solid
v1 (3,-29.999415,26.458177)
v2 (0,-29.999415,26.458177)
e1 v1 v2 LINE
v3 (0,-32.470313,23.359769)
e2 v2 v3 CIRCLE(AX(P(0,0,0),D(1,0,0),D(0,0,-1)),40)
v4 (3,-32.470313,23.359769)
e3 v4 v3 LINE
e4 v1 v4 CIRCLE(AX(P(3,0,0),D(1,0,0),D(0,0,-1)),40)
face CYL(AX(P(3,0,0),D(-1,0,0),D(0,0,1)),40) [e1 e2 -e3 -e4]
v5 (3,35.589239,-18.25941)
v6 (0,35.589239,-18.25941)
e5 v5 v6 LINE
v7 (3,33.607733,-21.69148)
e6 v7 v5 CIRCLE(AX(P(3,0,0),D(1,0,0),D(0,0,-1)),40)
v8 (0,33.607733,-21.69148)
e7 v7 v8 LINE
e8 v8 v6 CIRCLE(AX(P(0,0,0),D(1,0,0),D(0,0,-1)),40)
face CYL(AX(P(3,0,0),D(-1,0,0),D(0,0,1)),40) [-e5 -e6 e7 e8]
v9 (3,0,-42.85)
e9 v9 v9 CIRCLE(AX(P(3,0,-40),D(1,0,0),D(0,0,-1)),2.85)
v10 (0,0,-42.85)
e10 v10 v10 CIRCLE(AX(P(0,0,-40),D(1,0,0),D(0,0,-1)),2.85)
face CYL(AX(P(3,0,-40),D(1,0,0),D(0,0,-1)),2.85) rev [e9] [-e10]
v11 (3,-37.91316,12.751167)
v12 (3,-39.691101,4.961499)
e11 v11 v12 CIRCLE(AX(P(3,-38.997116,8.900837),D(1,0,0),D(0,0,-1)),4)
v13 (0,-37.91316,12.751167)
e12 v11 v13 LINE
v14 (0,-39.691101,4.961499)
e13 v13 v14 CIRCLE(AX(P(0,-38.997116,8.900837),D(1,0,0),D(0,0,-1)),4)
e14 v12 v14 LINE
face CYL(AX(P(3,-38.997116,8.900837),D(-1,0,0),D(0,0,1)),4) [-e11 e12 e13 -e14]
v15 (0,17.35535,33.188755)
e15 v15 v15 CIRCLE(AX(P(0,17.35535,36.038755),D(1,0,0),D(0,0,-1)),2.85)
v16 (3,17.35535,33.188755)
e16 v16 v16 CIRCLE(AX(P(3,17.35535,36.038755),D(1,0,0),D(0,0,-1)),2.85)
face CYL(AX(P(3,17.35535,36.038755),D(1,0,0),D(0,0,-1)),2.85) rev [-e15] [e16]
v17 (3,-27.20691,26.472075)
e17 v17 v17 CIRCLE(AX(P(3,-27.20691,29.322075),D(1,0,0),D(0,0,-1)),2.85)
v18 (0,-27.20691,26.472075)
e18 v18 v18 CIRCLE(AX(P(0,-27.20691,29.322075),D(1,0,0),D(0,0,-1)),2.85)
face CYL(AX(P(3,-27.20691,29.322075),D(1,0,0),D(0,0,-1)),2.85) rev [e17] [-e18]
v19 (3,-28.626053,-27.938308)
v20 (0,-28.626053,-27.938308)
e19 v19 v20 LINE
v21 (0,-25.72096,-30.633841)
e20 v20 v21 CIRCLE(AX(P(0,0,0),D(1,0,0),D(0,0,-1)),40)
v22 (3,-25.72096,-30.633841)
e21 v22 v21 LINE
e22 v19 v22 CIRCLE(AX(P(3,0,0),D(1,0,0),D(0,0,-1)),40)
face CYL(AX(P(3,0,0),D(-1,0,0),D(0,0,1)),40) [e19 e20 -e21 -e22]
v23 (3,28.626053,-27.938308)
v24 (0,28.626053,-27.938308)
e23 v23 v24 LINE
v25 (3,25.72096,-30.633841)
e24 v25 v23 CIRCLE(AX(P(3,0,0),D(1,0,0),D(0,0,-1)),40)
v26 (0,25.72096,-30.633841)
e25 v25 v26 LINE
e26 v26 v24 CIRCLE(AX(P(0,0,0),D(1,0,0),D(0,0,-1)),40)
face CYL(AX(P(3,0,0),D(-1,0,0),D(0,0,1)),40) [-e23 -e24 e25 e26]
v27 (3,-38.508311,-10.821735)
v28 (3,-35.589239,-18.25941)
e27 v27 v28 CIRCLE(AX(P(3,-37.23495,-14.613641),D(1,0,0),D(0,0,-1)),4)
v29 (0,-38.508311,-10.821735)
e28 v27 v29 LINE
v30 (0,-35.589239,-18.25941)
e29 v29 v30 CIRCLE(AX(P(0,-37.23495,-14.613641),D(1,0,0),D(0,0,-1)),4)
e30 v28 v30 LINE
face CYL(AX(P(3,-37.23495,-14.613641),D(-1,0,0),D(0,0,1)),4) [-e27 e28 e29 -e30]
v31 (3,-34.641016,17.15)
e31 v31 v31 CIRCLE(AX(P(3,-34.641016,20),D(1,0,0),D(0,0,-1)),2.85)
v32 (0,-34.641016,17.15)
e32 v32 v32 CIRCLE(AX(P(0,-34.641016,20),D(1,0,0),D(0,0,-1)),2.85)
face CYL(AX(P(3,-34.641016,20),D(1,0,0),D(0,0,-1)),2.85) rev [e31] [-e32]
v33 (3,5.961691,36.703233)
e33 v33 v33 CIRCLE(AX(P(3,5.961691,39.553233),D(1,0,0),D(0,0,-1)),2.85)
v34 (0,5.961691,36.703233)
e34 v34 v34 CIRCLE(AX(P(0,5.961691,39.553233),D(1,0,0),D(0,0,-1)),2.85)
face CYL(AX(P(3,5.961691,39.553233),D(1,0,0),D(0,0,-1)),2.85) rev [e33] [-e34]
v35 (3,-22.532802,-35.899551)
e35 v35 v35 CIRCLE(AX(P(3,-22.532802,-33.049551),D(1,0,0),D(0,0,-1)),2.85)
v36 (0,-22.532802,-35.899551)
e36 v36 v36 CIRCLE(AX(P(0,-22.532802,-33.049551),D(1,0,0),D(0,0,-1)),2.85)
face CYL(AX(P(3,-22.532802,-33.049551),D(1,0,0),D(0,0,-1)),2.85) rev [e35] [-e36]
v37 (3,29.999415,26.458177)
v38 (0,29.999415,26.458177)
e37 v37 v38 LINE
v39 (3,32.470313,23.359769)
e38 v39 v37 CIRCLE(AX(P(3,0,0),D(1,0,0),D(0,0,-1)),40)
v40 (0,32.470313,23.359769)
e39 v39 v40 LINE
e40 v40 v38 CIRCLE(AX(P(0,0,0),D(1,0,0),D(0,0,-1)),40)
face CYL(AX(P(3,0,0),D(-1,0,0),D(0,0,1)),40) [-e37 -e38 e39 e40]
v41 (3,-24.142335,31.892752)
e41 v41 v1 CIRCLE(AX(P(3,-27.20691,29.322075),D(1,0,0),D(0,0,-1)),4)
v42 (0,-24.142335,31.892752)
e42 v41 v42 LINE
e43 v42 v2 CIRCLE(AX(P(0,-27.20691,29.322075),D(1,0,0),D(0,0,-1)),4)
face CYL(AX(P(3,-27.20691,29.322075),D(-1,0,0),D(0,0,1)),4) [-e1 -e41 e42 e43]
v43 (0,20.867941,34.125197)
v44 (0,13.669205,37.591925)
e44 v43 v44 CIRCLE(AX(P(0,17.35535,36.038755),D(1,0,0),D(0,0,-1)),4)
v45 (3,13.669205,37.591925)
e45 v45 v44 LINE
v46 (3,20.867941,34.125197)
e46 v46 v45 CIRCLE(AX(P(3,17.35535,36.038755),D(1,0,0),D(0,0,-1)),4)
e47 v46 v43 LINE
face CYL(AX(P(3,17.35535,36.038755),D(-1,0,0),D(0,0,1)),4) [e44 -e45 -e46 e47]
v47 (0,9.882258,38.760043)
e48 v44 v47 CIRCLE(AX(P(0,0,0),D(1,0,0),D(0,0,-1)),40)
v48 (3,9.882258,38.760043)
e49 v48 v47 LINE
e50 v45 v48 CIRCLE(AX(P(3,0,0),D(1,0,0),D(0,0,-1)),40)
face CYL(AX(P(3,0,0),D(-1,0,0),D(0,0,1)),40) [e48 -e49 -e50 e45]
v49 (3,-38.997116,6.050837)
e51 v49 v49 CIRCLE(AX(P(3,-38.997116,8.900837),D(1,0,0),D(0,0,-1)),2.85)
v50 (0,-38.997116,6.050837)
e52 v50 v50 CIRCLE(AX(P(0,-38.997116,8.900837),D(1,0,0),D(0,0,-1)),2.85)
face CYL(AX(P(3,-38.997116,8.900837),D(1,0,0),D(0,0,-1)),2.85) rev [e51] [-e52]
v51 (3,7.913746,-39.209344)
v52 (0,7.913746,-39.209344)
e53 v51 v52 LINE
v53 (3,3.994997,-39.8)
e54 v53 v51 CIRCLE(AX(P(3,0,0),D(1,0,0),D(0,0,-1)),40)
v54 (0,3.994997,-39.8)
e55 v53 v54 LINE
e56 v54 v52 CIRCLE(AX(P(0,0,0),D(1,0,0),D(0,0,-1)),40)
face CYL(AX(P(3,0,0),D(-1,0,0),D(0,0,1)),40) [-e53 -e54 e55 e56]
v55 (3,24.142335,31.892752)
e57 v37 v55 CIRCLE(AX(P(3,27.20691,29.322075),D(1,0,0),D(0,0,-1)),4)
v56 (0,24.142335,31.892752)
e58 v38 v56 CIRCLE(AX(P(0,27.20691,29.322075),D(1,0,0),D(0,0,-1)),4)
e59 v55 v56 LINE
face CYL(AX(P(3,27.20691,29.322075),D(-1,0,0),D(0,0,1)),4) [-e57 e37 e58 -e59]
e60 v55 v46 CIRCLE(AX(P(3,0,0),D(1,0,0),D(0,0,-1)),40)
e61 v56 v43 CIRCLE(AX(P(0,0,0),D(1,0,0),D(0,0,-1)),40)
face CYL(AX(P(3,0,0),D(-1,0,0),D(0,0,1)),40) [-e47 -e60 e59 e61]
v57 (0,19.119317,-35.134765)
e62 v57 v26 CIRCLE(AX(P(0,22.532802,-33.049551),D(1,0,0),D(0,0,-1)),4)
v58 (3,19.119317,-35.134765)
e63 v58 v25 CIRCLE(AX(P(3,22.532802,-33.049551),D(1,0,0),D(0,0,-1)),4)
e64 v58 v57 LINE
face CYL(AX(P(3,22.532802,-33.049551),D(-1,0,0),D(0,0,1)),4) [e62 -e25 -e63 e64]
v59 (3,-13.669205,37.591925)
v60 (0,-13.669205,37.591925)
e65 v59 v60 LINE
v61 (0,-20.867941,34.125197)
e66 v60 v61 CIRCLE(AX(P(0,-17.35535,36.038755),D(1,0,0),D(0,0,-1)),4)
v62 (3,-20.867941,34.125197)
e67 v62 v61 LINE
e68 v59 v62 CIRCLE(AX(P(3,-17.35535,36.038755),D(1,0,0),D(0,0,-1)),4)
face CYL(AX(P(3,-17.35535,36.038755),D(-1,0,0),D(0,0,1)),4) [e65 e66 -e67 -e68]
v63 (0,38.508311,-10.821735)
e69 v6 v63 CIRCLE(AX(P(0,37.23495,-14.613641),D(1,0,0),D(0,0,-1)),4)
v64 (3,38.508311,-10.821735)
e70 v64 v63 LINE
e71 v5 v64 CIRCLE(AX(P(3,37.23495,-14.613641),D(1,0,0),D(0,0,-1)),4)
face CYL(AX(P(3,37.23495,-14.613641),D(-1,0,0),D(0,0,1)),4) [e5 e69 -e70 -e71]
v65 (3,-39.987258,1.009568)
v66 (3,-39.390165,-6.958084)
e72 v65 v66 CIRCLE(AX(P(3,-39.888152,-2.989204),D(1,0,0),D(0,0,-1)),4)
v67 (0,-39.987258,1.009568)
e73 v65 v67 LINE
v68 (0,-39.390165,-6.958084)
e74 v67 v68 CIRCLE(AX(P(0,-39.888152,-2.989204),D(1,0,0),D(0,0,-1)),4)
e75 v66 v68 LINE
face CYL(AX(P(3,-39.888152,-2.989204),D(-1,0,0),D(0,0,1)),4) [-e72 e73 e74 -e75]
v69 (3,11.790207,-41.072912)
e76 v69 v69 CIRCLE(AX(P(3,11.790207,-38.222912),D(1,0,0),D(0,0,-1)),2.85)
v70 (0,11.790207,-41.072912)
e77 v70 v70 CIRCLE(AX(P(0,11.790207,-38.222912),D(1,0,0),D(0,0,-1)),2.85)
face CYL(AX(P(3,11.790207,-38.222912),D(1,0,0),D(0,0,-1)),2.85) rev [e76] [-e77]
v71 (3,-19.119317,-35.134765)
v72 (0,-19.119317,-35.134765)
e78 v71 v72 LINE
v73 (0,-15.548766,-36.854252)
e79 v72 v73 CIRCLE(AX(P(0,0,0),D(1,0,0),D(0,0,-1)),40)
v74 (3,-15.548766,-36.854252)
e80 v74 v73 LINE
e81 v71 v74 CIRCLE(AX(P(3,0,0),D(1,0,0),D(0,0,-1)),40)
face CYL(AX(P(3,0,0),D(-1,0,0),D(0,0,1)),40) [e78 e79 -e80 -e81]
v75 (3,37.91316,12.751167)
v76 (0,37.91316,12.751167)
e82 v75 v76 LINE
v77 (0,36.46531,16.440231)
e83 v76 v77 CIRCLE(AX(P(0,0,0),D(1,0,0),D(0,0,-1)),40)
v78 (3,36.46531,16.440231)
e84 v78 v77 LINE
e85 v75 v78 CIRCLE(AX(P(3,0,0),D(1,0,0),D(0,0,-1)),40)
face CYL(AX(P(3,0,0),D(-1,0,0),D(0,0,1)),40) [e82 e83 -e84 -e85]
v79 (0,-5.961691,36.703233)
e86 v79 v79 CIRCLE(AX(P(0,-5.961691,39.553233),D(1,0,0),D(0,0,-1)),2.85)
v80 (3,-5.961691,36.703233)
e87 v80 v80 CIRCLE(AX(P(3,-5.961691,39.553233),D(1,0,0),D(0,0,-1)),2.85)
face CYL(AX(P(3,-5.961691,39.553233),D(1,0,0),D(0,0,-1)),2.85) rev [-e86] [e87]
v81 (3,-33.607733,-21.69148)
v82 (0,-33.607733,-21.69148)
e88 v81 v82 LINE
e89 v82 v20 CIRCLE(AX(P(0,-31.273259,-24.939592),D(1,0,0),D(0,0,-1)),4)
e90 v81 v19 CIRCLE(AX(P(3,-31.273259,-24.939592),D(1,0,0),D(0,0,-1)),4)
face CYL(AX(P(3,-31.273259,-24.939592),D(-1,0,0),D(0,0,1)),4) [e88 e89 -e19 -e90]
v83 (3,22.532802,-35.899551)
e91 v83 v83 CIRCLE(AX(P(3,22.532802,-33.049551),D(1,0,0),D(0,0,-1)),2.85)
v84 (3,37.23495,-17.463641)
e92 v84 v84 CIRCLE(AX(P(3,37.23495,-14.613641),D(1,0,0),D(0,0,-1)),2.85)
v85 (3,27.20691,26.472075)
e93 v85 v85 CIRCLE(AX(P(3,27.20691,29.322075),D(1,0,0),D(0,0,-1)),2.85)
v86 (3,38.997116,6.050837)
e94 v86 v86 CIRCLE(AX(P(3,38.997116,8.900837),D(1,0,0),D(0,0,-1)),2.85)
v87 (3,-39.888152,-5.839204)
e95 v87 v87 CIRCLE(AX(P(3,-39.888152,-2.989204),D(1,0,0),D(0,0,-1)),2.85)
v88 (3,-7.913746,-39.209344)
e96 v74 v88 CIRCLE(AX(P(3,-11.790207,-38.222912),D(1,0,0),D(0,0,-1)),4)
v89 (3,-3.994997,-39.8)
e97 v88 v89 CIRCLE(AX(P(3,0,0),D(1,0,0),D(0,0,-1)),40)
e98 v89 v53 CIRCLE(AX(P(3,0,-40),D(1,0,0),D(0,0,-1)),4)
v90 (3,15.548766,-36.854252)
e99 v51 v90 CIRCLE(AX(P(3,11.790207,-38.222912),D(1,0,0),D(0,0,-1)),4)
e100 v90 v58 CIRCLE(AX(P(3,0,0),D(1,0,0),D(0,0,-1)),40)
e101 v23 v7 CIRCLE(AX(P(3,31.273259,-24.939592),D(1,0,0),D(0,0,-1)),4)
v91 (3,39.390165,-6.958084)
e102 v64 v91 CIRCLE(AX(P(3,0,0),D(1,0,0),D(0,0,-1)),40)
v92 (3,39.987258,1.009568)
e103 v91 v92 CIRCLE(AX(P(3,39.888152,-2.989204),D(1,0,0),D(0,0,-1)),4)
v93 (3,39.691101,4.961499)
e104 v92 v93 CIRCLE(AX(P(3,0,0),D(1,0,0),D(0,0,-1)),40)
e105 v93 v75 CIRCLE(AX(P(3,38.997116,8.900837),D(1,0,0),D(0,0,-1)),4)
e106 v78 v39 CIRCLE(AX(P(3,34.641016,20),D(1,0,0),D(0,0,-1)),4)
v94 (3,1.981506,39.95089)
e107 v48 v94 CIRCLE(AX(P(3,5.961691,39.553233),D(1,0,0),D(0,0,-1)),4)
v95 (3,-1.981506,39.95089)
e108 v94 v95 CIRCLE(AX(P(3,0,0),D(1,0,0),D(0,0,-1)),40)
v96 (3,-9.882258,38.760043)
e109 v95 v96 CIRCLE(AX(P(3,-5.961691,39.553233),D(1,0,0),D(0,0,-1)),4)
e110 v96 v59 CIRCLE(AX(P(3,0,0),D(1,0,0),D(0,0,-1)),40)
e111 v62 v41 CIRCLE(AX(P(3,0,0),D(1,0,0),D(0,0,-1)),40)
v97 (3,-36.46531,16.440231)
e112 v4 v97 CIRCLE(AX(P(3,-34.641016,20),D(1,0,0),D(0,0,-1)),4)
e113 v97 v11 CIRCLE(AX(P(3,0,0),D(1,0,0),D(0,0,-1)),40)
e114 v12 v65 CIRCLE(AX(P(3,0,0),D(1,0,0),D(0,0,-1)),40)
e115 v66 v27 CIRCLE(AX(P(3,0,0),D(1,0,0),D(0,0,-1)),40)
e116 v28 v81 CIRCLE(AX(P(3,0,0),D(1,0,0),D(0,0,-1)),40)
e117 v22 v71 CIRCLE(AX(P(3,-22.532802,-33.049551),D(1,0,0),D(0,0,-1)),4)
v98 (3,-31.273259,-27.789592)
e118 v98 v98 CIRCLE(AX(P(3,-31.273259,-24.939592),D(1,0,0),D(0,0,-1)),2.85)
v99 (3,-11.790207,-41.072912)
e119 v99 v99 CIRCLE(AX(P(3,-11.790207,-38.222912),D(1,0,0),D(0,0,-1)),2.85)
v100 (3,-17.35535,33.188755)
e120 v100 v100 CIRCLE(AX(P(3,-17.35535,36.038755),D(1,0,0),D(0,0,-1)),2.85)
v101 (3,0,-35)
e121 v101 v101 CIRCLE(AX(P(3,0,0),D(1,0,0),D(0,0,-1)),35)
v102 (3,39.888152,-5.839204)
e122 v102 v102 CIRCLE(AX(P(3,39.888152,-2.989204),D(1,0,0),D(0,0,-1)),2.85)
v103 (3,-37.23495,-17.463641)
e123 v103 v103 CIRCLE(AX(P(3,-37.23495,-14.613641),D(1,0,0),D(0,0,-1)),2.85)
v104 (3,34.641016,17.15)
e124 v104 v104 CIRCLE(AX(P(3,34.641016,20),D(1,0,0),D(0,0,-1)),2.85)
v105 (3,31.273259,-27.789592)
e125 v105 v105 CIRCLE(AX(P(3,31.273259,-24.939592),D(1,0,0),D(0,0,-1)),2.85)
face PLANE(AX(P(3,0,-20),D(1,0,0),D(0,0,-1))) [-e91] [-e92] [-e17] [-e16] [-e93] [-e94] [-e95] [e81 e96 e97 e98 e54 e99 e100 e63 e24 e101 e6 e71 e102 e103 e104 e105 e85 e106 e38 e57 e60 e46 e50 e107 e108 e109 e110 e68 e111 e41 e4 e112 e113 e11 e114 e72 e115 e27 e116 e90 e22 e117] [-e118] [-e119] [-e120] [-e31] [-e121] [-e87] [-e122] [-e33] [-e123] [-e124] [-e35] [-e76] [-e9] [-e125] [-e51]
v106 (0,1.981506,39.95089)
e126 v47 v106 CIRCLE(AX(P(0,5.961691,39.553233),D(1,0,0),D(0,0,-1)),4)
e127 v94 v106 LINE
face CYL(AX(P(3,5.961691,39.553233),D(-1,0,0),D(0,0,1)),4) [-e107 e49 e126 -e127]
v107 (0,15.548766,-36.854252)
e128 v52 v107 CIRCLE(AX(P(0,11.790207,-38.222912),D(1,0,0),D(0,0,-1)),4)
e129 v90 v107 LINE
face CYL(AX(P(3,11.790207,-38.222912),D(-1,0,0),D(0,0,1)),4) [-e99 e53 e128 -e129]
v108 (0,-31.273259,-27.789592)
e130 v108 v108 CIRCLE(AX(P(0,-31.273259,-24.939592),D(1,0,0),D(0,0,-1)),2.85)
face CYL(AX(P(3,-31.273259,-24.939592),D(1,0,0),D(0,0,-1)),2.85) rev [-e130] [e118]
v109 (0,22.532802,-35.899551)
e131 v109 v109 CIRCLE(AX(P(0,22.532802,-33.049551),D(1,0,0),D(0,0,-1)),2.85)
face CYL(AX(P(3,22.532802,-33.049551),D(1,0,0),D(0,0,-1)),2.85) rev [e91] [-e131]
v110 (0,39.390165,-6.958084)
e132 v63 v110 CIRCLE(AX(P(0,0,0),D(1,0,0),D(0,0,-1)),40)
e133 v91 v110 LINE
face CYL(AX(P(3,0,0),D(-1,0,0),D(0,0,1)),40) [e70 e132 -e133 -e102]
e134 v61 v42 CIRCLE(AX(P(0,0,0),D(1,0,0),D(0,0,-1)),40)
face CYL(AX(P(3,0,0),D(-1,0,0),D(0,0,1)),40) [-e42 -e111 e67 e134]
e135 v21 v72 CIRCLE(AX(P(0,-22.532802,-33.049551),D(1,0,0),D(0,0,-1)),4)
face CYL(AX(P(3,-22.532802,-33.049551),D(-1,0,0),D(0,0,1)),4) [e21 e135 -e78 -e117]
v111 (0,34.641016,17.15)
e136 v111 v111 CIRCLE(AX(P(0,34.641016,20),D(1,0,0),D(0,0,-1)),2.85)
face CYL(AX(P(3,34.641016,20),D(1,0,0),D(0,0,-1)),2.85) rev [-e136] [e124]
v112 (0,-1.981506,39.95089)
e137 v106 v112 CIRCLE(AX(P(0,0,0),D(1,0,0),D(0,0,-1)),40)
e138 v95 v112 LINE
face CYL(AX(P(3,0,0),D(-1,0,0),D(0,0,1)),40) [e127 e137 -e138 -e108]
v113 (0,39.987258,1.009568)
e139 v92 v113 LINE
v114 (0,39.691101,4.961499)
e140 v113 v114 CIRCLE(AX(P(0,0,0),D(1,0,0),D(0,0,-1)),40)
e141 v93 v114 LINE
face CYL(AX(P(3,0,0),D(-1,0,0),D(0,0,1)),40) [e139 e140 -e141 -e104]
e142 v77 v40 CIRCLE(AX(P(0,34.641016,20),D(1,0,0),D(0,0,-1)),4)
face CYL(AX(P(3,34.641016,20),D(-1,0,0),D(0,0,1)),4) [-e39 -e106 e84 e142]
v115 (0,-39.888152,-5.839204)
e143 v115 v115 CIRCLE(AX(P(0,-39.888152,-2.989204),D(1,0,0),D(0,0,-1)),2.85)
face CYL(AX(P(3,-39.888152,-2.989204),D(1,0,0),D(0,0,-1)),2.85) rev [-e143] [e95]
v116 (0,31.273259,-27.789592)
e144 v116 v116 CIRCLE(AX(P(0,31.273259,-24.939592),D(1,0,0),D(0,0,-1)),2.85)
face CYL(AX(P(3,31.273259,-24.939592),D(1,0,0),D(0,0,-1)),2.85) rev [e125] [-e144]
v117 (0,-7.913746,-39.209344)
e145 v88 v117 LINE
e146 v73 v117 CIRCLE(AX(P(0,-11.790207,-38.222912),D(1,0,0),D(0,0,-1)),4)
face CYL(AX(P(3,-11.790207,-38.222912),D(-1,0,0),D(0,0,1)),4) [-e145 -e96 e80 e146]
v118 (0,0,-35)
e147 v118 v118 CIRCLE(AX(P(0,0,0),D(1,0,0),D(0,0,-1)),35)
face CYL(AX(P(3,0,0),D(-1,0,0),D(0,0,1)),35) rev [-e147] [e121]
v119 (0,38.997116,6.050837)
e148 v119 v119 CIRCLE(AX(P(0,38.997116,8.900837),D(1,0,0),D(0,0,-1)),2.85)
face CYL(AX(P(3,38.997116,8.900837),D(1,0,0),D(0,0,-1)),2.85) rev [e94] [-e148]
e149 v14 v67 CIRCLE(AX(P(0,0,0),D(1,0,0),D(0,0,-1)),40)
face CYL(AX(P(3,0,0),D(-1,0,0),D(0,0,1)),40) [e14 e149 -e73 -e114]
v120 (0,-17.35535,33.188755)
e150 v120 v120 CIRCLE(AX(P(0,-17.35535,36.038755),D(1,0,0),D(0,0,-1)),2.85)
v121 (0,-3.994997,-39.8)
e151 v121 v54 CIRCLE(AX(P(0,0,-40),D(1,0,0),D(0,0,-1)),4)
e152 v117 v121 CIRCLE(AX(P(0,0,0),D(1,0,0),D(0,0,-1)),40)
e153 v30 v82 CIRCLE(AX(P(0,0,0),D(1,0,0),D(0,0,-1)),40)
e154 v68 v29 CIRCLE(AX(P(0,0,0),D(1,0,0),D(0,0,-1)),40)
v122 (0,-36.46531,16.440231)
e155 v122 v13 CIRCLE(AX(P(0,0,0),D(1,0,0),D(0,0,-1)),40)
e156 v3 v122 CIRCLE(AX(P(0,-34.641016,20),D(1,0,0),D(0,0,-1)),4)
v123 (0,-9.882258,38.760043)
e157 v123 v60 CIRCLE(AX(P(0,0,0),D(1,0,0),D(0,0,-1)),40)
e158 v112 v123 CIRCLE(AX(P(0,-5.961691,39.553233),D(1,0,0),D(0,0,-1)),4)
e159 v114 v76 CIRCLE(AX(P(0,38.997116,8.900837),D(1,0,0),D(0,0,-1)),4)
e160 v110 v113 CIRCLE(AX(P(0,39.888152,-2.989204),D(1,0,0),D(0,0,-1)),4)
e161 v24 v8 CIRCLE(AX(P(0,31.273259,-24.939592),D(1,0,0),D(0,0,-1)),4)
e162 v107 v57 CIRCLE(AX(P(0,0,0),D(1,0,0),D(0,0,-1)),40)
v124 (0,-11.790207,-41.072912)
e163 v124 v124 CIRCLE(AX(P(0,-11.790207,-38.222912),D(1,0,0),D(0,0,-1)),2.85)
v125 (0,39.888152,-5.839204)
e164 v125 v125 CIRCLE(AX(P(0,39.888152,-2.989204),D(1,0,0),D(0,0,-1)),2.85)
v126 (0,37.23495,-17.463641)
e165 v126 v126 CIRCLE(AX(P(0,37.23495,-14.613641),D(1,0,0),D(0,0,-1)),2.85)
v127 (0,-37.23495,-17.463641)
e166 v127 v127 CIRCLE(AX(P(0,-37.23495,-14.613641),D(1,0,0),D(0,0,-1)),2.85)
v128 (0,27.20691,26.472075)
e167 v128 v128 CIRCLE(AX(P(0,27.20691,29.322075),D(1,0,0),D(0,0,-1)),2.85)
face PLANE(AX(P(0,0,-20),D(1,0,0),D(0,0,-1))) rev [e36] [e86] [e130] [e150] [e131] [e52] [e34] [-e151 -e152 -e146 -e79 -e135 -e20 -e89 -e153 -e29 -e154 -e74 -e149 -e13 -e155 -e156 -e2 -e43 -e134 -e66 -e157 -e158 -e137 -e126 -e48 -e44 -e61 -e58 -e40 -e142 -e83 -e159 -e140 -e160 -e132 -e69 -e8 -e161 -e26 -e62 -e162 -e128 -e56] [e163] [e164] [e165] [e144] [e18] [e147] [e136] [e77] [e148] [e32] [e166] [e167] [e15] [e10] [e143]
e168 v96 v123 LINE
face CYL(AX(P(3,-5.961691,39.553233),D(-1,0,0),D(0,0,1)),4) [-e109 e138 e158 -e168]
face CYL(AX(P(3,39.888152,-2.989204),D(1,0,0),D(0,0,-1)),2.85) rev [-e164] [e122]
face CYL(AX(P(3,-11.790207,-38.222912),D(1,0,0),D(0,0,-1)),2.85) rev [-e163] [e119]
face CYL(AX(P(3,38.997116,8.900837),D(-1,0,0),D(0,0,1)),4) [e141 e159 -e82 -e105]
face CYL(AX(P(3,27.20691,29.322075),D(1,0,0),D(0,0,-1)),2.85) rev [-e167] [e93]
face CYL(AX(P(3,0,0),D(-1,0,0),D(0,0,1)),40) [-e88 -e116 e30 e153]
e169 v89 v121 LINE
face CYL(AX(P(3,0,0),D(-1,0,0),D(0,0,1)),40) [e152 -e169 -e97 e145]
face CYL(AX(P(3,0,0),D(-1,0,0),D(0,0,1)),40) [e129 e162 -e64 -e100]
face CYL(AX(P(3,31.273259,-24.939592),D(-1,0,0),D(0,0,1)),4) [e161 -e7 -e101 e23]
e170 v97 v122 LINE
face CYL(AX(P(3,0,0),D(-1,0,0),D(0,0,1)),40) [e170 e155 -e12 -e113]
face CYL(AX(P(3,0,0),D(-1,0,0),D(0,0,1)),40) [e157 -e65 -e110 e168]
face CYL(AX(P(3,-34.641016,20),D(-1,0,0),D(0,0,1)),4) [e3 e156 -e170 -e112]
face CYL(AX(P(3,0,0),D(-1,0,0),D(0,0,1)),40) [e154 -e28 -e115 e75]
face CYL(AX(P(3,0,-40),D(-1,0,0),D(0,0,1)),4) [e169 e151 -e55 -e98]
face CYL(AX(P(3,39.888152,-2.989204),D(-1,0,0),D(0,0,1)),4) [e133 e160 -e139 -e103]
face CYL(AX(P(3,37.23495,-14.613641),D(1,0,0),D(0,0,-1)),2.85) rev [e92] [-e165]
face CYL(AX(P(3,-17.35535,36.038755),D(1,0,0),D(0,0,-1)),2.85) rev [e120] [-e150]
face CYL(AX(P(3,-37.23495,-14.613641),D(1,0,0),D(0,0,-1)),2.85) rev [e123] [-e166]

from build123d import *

# Parameters (mm, degrees)
LINEAR_AUSTRAGEN_D_NN1_OUTLINE_R = 35
LINEAR_AUSTRAGEN_D_NN1_DEPTH     = 3
F_5_7_5_7_DURCHMESSER_BOHRUNG1_D = 5.7
KREISMUSTER1_COUNT               = 21


# Read off the part's stored shape, not the designer's step: Linear-Austragen-Dünn1
with BuildPart() as part:
    # Linear-Austragen-Dünn1 outline → Linear-Austragen-Dünn1 (new body)
    with BuildSketch(Plane(origin=(0, 0, 0), x_dir=(0, 0, -1), z_dir=(1, 0, 0))):
        with BuildLine():
            ThreePointArc((39.8, -3.994996871), (44, 0), (39.8, 3.994996871))
            ThreePointArc((39.8, 3.994996871), (39.553233049, 5.961690647), (39.20934367, 7.913745572))
            ThreePointArc((39.20934367, 7.913745572), (42.045203455, 12.969227674), (36.854251671, 15.548766311))
            ThreePointArc((36.854251671, 15.548766311), (36.038754716, 17.355349565), (35.134765087, 19.119316993))
            ThreePointArc((35.134765087, 19.119316993), (36.35450607, 24.786082555), (30.633841348, 25.720959629))
            ThreePointArc((30.633841348, 25.720959629), (29.322074873, 27.206909511), (27.93830844, 28.626053195))
            ThreePointArc((27.93830844, 28.626053195), (27.433551282, 34.400585229), (21.691479788, 33.60773281))
            ThreePointArc((21.691479788, 33.60773281), (20, 34.641016151), (18.259410483, 35.589238947))
            ThreePointArc((18.259410483, 35.589238947), (16.075005072, 40.95844494), (10.821735057, 38.508311445))
            ThreePointArc((10.821735057, 38.508311445), (8.900837358, 38.997116487), (6.958083774, 39.390164638))
            ThreePointArc((6.958083774, 39.390164638), (3.288124118, 43.876967076), (-1.009568325, 39.987257618))
            ThreePointArc((-1.009568325, 39.987257618), (-2.989203744, 39.888151887), (-4.961499213, 39.69110134))
            ThreePointArc((-4.961499213, 39.69110134), (-9.790921094, 42.896828136), (-12.75116713, 37.91316047))
            ThreePointArc((-12.75116713, 37.91316047), (-14.613640975, 37.234949946), (-16.440231222, 36.465309506))
            ThreePointArc((-16.440231222, 36.465309506), (-22, 38.105117767), (-23.359768778, 32.470312635))
            ThreePointArc((-23.359768778, 32.470312635), (-24.939592074, 31.273259299), (-26.45817654, 29.999414898))
            ThreePointArc((-26.45817654, 29.999414898), (-32.254282361, 29.927600462), (-31.892752458, 24.142335029))
            ThreePointArc((-31.892752458, 24.142335029), (-33.049550973, 22.532802323), (-34.125196762, 20.867940625))
            ThreePointArc((-34.125196762, 20.867940625), (-39.642630188, 19.090884522), (-37.591925123, 13.669205009))
            ThreePointArc((-37.591925123, 13.669205009), (-38.222912231, 11.790206977), (-38.760043497, 9.882258251))
            ThreePointArc((-38.760043497, 9.882258251), (-43.508556354, 6.557859712), (-39.950890271, 1.981506137))
            ThreePointArc((-39.950890271, 1.981506137), (-40, 0), (-39.950890271, -1.981506137))
            ThreePointArc((-39.950890271, -1.981506137), (-43.508556354, -6.557859712), (-38.760043497, -9.882258251))
            ThreePointArc((-38.760043497, -9.882258251), (-38.222912231, -11.790206977), (-37.591925123, -13.669205009))
            ThreePointArc((-37.591925123, -13.669205009), (-39.642630188, -19.090884522), (-34.125196762, -20.867940625))
            ThreePointArc((-34.125196762, -20.867940625), (-33.049550973, -22.532802323), (-31.892752458, -24.142335029))
            ThreePointArc((-31.892752458, -24.142335029), (-32.254282361, -29.927600462), (-26.45817654, -29.999414898))
            ThreePointArc((-26.45817654, -29.999414898), (-24.939592074, -31.273259299), (-23.359768778, -32.470312635))
            ThreePointArc((-23.359768778, -32.470312635), (-22, -38.105117767), (-16.440231222, -36.465309506))
            ThreePointArc((-16.440231222, -36.465309506), (-14.613640975, -37.234949946), (-12.75116713, -37.91316047))
            ThreePointArc((-12.75116713, -37.91316047), (-9.790921094, -42.896828136), (-4.961499213, -39.69110134))
            ThreePointArc((-4.961499213, -39.69110134), (-2.989203744, -39.888151887), (-1.009568325, -39.987257618))
            ThreePointArc((-1.009568325, -39.987257618), (3.288124118, -43.876967076), (6.958083774, -39.390164638))
            ThreePointArc((6.958083774, -39.390164638), (8.900837358, -38.997116487), (10.821735057, -38.508311445))
            ThreePointArc((10.821735057, -38.508311445), (16.075005072, -40.95844494), (18.259410483, -35.589238947))
            ThreePointArc((18.259410483, -35.589238947), (20, -34.641016151), (21.691479788, -33.60773281))
            ThreePointArc((21.691479788, -33.60773281), (27.433551282, -34.400585229), (27.93830844, -28.626053195))
            ThreePointArc((27.93830844, -28.626053195), (29.322074873, -27.206909511), (30.633841348, -25.720959629))
            ThreePointArc((30.633841348, -25.720959629), (36.35450607, -24.786082555), (35.134765087, -19.119316993))
            ThreePointArc((35.134765087, -19.119316993), (36.038754716, -17.355349565), (36.854251671, -15.548766311))
            ThreePointArc((36.854251671, -15.548766311), (42.045203455, -12.969227674), (39.20934367, -7.913745572))
            ThreePointArc((39.20934367, -7.913745572), (39.553233049, -5.961690647), (39.8, -3.994996871))
        make_face()
        Circle(LINEAR_AUSTRAGEN_D_NN1_OUTLINE_R, mode=Mode.SUBTRACT)
    extrude(amount=LINEAR_AUSTRAGEN_D_NN1_DEPTH)

    # Ø5.7 (5.7) Durchmesser Bohrung1 (through all)
    with Locations(Plane(origin=(3, 0, 0), x_dir=(0, 0, -1), z_dir=(1, 0, 0))):
        with Locations((40, 0)):
            f_5_7_5_7_durchmesser_bohrung1 = Hole(F_5_7_5_7_DURCHMESSER_BOHRUNG1_D / 2)

    # Kreismuster1: Ø5.7 (5.7) Durchmesser Bohrung1 ×21 about axis
    kreismuster1_axis = Axis((0, 0, 0), (1, 0, 0))
    for i in range(1, KREISMUSTER1_COUNT):
        add(f_5_7_5_7_durchmesser_bohrung1.rotate(kreismuster1_axis, i * 360 / KREISMUSTER1_COUNT), mode=Mode.SUBTRACT)


solid = part.part
